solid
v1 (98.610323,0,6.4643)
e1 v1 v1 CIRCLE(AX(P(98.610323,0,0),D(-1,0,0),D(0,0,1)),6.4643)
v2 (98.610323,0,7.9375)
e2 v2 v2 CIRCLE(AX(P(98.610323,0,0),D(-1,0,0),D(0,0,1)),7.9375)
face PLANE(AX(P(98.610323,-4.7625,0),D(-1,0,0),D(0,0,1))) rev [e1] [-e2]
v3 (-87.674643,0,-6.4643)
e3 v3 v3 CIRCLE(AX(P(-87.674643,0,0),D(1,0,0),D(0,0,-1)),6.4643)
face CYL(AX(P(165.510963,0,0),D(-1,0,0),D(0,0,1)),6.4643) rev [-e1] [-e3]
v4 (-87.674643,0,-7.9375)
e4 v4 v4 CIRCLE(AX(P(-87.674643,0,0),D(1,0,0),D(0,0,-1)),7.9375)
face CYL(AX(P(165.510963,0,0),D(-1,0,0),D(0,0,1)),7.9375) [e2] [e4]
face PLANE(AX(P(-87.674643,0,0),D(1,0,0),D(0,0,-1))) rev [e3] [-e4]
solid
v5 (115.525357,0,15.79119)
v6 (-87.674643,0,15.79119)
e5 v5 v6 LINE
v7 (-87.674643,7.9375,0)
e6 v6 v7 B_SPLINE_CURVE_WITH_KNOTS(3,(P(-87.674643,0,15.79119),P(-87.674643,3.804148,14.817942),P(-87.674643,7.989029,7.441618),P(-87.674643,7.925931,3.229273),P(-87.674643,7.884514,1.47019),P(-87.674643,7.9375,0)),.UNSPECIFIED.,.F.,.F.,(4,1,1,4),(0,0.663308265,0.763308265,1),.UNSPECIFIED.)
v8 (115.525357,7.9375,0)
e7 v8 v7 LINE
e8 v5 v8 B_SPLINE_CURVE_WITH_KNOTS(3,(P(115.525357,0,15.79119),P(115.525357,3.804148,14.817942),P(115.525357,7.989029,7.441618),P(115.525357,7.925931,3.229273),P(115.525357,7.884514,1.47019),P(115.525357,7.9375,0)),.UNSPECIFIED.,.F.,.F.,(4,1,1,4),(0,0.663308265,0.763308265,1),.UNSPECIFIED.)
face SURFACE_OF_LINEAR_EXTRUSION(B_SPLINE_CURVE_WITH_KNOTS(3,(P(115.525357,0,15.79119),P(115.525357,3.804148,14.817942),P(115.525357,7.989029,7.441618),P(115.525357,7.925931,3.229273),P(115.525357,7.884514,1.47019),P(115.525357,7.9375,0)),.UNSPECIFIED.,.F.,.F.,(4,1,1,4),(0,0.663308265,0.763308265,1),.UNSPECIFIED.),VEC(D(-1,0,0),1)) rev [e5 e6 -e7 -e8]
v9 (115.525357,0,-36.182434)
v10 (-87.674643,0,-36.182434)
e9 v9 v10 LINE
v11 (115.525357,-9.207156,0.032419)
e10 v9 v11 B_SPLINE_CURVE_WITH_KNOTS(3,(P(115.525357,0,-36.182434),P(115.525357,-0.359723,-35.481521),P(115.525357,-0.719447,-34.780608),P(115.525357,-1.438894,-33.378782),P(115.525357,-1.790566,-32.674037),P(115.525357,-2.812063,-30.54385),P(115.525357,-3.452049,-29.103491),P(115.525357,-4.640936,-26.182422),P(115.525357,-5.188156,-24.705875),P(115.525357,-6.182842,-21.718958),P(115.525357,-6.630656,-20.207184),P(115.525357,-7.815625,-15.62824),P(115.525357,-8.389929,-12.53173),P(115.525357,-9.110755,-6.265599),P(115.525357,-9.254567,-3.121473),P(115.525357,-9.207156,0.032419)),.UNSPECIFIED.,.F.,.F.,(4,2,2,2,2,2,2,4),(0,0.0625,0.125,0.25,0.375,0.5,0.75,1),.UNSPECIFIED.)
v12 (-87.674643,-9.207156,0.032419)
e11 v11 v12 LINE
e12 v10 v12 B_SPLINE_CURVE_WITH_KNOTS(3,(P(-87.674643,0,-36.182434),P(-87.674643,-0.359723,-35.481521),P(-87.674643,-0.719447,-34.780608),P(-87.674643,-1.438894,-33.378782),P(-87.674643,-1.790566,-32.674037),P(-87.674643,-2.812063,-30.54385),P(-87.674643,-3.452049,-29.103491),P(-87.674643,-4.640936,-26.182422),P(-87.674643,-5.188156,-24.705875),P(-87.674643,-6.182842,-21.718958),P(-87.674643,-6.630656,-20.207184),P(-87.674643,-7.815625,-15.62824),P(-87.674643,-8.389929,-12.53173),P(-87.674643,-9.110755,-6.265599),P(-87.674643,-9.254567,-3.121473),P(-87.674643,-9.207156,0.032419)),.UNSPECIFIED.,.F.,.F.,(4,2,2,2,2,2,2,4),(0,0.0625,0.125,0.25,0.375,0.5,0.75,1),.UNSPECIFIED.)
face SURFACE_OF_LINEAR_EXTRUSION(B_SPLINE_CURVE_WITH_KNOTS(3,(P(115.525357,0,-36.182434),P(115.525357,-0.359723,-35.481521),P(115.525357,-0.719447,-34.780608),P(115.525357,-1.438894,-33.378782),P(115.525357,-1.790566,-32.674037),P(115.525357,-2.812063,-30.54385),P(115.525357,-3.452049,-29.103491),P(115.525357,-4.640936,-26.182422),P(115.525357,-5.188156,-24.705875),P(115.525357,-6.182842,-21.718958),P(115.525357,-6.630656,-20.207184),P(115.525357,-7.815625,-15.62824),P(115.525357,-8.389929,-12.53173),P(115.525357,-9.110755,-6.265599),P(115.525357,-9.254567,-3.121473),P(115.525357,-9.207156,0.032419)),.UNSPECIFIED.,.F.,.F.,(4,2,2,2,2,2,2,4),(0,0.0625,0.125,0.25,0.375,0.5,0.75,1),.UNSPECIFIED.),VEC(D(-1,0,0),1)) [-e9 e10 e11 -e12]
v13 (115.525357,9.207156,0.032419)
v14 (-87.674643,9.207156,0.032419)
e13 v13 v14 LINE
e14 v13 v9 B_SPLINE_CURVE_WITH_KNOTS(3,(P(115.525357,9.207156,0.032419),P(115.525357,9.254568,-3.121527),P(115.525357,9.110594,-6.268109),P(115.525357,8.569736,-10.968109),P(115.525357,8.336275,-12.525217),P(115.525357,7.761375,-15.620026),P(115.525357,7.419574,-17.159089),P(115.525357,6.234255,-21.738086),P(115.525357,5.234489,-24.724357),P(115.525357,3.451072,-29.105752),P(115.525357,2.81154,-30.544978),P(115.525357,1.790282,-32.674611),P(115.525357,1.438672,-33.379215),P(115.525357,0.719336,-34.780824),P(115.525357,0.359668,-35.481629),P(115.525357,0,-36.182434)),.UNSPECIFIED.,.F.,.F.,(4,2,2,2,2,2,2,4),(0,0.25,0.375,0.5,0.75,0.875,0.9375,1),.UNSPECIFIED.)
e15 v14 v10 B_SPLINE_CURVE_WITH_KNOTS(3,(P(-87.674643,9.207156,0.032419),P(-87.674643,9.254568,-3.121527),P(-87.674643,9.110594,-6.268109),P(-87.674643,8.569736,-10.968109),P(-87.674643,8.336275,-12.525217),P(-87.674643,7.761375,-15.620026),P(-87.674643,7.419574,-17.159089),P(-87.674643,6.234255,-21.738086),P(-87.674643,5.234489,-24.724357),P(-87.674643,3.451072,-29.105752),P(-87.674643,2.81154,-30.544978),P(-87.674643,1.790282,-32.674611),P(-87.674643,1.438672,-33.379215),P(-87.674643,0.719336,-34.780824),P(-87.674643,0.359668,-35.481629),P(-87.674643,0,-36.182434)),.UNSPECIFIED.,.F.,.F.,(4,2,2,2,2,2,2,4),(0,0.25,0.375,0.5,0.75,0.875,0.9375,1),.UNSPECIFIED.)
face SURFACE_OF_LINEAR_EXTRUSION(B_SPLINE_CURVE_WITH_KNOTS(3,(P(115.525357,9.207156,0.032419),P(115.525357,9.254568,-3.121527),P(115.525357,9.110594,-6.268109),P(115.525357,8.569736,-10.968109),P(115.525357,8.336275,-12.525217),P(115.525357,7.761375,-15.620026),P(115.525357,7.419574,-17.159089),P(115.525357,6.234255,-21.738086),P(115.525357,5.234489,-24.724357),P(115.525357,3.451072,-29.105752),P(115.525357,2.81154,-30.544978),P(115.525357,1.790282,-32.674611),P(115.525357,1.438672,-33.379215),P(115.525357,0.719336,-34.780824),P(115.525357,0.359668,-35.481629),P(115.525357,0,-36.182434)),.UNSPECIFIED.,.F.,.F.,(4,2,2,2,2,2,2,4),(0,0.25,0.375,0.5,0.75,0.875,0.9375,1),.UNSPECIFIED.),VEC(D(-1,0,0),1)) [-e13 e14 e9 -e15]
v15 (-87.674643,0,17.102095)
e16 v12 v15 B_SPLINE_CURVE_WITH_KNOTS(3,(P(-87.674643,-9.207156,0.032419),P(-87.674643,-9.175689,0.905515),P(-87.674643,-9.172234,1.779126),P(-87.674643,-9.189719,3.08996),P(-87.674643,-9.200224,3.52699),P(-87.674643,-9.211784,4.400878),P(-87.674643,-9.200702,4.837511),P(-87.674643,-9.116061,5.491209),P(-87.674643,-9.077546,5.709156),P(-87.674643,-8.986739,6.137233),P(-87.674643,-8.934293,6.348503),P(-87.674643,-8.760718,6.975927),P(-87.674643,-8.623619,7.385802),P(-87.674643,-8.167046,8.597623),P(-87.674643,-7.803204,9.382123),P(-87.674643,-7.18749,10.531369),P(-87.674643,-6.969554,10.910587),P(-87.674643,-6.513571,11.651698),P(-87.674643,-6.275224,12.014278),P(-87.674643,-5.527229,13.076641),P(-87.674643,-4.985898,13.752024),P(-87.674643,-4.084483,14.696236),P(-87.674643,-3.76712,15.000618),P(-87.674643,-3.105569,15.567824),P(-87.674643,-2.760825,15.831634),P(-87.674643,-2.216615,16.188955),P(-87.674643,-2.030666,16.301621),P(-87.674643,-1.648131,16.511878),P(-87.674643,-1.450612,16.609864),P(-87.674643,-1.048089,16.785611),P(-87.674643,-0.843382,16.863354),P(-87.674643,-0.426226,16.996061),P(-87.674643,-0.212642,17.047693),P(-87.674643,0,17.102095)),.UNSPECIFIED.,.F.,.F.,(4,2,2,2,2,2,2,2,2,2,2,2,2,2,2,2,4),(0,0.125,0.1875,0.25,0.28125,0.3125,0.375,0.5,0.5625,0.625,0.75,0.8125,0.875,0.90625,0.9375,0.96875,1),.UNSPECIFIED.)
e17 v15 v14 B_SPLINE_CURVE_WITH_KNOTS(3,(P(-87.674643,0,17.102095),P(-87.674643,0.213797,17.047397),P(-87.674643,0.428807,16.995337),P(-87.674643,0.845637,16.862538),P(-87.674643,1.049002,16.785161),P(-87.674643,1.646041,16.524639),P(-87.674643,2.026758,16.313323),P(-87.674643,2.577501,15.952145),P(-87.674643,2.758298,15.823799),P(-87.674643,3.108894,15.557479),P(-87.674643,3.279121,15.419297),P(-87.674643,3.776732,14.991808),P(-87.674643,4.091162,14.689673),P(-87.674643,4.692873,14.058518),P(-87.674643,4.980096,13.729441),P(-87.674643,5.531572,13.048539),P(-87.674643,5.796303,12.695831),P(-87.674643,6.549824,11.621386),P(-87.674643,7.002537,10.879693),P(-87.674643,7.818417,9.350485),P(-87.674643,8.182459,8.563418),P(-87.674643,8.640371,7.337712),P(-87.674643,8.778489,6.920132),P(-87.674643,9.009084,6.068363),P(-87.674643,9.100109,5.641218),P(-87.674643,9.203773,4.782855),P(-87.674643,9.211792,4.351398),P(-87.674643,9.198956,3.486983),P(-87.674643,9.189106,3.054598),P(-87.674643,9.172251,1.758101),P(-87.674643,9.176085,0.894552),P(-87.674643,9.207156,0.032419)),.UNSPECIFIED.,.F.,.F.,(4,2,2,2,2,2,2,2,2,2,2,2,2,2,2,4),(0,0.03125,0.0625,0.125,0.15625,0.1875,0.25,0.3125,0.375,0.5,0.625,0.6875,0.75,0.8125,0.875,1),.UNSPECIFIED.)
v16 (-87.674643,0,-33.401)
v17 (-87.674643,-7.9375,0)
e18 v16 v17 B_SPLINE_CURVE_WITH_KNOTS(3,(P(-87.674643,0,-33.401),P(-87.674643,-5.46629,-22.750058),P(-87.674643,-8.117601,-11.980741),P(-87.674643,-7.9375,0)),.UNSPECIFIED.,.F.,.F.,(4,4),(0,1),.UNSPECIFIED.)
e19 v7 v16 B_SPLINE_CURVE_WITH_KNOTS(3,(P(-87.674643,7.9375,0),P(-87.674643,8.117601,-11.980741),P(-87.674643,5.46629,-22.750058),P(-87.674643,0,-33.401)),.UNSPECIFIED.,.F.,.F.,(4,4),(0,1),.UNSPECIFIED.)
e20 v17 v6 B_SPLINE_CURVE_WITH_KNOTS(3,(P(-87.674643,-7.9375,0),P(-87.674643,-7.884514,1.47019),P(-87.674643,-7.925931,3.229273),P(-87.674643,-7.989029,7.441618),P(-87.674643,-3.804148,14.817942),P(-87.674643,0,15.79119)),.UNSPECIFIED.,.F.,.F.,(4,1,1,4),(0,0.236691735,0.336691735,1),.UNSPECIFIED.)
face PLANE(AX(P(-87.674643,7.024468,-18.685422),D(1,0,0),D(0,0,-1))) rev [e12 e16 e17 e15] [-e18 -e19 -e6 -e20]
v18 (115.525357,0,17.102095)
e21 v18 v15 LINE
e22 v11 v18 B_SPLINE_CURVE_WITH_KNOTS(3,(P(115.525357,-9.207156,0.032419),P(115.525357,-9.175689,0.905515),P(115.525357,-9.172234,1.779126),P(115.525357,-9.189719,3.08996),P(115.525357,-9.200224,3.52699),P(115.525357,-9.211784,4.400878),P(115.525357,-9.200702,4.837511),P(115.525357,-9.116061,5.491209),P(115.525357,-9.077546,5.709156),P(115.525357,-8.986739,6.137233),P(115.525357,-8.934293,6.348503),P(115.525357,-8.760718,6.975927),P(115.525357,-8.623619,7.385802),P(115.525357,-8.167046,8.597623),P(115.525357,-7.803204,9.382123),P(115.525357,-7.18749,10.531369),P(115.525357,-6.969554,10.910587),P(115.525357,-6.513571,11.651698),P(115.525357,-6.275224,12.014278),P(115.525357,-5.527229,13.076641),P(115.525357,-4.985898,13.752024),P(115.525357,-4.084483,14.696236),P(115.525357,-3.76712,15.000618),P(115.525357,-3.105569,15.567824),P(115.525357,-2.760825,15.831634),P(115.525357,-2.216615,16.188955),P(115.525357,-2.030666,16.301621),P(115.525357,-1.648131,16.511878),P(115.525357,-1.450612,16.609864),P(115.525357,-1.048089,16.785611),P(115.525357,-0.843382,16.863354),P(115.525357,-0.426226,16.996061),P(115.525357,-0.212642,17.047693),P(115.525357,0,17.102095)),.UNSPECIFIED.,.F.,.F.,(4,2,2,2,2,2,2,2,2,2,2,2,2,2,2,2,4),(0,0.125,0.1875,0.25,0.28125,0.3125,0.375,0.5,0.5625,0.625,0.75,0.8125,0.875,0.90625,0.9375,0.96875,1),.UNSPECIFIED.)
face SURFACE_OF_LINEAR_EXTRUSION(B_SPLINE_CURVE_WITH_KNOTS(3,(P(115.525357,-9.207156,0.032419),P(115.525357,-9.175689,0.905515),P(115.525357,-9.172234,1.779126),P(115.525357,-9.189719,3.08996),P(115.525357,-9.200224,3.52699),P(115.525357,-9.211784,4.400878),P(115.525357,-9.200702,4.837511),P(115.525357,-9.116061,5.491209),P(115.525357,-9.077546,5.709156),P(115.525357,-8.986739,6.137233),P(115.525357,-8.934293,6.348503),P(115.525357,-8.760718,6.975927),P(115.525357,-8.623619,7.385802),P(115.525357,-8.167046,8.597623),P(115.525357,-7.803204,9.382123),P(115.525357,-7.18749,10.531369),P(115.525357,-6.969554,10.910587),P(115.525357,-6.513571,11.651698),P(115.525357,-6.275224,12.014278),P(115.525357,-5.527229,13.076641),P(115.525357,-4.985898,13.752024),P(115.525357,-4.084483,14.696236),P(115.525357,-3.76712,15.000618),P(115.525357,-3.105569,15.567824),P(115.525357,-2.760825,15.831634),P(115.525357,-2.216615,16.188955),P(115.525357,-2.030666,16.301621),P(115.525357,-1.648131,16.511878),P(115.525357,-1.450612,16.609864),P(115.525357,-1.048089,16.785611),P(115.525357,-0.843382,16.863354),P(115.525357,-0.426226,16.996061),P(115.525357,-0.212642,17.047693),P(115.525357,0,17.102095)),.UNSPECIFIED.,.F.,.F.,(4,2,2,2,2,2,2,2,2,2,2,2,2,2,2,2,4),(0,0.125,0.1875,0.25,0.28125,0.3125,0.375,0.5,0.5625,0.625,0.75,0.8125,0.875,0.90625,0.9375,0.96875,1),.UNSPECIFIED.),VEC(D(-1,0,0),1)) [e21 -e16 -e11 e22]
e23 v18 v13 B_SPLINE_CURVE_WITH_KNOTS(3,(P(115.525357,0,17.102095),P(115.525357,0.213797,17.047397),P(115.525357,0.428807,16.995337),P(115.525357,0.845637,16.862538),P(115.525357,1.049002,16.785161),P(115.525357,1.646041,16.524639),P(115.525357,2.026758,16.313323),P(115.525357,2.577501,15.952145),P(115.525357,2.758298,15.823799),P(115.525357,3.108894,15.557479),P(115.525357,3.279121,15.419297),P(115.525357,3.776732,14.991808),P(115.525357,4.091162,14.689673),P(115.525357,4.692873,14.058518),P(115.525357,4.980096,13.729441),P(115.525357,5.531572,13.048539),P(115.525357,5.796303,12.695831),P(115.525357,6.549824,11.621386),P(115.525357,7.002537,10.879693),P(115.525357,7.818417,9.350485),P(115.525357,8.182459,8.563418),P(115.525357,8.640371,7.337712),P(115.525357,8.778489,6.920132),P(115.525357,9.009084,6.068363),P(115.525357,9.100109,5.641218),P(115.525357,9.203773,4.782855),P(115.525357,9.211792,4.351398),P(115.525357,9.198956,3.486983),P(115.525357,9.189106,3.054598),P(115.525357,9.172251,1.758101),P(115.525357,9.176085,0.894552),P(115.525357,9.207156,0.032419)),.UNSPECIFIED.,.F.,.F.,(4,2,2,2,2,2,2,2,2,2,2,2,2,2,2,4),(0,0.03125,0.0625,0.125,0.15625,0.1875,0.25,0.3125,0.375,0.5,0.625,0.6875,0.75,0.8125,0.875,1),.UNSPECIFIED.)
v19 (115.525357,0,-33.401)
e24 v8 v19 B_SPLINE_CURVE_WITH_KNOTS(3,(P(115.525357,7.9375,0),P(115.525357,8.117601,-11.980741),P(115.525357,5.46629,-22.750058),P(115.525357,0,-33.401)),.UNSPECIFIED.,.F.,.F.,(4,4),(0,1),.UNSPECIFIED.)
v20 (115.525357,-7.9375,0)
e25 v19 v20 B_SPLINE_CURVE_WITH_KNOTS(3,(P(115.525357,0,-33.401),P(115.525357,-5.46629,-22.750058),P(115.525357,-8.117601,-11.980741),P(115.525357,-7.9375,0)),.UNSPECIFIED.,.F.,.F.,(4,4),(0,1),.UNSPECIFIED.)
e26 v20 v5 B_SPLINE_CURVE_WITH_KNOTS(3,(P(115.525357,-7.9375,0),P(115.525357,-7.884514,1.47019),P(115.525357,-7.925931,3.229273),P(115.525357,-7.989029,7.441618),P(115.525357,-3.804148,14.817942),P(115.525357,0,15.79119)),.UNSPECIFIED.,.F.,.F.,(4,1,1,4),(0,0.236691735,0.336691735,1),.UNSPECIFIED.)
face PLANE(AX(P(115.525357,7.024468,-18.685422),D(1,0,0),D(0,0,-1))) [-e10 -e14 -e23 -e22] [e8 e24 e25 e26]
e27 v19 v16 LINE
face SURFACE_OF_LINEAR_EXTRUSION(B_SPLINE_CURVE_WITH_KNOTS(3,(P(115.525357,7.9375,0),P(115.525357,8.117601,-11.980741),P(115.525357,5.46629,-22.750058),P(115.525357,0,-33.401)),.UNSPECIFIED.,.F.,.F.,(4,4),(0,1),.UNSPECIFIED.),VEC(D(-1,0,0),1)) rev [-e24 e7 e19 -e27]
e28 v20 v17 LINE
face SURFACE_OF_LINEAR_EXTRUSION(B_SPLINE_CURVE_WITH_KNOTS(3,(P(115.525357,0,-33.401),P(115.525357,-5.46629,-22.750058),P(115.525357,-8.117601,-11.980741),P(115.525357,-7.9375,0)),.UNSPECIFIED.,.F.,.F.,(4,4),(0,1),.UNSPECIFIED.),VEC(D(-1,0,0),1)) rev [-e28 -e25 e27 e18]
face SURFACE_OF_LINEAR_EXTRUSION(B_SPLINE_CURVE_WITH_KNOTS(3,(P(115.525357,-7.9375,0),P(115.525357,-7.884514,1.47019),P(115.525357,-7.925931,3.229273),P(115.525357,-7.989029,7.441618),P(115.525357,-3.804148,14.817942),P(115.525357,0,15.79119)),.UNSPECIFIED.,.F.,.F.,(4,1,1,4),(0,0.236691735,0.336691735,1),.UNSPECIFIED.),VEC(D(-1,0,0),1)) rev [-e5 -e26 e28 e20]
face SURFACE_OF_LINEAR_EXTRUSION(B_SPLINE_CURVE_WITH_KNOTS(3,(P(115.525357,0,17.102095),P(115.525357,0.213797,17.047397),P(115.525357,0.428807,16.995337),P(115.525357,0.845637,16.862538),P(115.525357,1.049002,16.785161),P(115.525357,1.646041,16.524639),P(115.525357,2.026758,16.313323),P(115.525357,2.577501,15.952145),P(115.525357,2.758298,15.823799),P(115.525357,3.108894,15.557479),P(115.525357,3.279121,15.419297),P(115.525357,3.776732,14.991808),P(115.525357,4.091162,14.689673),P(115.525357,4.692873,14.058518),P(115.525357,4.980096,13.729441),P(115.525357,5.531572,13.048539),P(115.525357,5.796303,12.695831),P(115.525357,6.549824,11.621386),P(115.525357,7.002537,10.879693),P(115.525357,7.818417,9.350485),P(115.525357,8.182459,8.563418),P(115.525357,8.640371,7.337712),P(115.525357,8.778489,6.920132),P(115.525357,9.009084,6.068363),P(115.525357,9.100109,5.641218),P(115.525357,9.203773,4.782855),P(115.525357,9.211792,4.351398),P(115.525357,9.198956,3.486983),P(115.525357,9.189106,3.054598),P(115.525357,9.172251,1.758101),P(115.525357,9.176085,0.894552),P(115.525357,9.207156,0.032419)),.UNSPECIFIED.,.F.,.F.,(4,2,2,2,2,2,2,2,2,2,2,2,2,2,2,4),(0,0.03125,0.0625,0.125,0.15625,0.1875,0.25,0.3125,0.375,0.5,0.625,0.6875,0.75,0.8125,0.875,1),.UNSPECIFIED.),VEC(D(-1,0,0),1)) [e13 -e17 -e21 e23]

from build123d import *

# Parameters (mm, degrees)
BOSS_EXTRUDE1_DEPTH      = 98.610323
BOSS_EXTRUDE1_DEPTH_BACK = 87.674643
SKETCH1_R                = 7.9375
SKETCH1_R_2              = 6.4643
EXTRUDE_THIN1_START      = -203.2
EXTRUDE_THIN1_DEPTH      = 203.2


# Read off the part's stored shape, not the designer's step: Extrude-Thin1
with BuildPart() as part:
    # Sketch1 → Boss-Extrude1 (new, two sides: drawn at the far end of the back side and taken through both)
    with BuildSketch(Plane(origin=(0, 0, 0), x_dir=(0, 0, -1), z_dir=(1, 0, 0)).offset(-BOSS_EXTRUDE1_DEPTH_BACK)):
        with Locations(Location((0, 0, 0), (0, 0, 180))):
            Circle(SKETCH1_R)
        with Locations(Location((0, 0, 0), (0, 0, 180))):
            Circle(SKETCH1_R_2, mode=Mode.SUBTRACT)
    extrude(amount=BOSS_EXTRUDE1_DEPTH + BOSS_EXTRUDE1_DEPTH_BACK)


with BuildPart() as body_2:
    # Extrude-Thin1 outline → Extrude-Thin1 (new body)
    with BuildSketch(Plane.ZY.offset(87.674642954).offset(EXTRUDE_THIN1_START)):
        with BuildLine():
            add(Edge.make_bspline(
                [(17.102094562, 0), (17.04739702, 0.213797016), (16.995336819, 0.42880706), (16.862538118, 0.845636753), (16.785160791, 1.049002351), (16.524638716, 1.646041309), (16.313322861, 2.026757553), (15.952145288, 2.577500677), (15.823799266, 2.758298236), (15.55747882, 3.108894312), (15.419296606, 3.279121061), (14.991807723, 3.776732023), (14.689672994, 4.091162254), (14.058517718, 4.692872976), (13.729440661, 4.980096404), (13.048538768, 5.531572182), (12.695830839, 5.79630298), (11.621386484, 6.549823619), (10.879692917, 7.002537116), (9.350485078, 7.81841744), (8.563418356, 8.182458905), (7.337712392, 8.640371405), (6.920131838, 8.778488758), (6.068362945, 9.009083778), (5.641217648, 9.100109427), (4.782855054, 9.20377314), (4.351397815, 9.211792234), (3.486983413, 9.198956322), (3.054597909, 9.189105956), (1.758100925, 9.172251023), (0.894552451, 9.176084553), (0.032418914, 9.207156149)],
                knots=[0, 0, 0, 0, 0.03125, 0.03125, 0.0625, 0.0625, 0.125, 0.125, 0.15625, 0.15625, 0.1875, 0.1875, 0.25, 0.25, 0.3125, 0.3125, 0.375, 0.375, 0.5, 0.5, 0.625, 0.625, 0.6875, 0.6875, 0.75, 0.75, 0.8125, 0.8125, 0.875, 0.875, 1, 1, 1, 1], degree=3))
            add(Edge.make_bspline(
                [(0.032418914, 9.207156149), (-3.121526951, 9.254567879), (-6.268108602, 9.110594057), (-10.968108502, 8.569736414), (-12.52521706, 8.336275013), (-15.620025789, 7.761375356), (-17.159089419, 7.419573925), (-21.738086481, 6.234254823), (-24.724357097, 5.234488958), (-29.105751606, 3.451071682), (-30.544977721, 2.811540258), (-32.674611159, 1.79028171), (-33.379214501, 1.438672145), (-34.780824408, 0.719336072), (-35.481629362, 0.359668036), (-36.182434315, 0)],
                knots=[0, 0, 0, 0, 0.25, 0.25, 0.375, 0.375, 0.5, 0.5, 0.75, 0.75, 0.875, 0.875, 0.9375, 0.9375, 1, 1, 1, 1], degree=3))
            add(Edge.make_bspline(
                [(-36.182434315, 0), (-35.481521346, -0.359723472), (-34.780608377, -0.719446944), (-33.378782439, -1.438893888), (-32.674037428, -1.790565857), (-30.54384954, -2.812063227), (-29.103490823, -3.452048995), (-26.182421908, -4.640936279), (-24.705875102, -5.18815569), (-21.718958236, -6.182841679), (-20.207183631, -6.630656344), (-15.628240433, -7.815624895), (-12.531730425, -8.389928975), (-6.265599348, -9.11075463), (-3.121472775, -9.254567065), (0.032418914, -9.207156149)],
                knots=[0, 0, 0, 0, 0.0625, 0.0625, 0.125, 0.125, 0.25, 0.25, 0.375, 0.375, 0.5, 0.5, 0.75, 0.75, 1, 1, 1, 1], degree=3))
            add(Edge.make_bspline(
                [(0.032418914, -9.207156149), (0.905514517, -9.175689476), (1.779125635, -9.172233827), (3.089959502, -9.189718729), (3.526990194, -9.200223759), (4.400877656, -9.211783508), (4.837511077, -9.200702397), (5.491209368, -9.116060671), (5.709156111, -9.077545633), (6.137233482, -8.98673913), (6.348502946, -8.934293247), (6.975926684, -8.760718275), (7.385801524, -8.623619453), (8.597622689, -8.167045839), (9.38212336, -7.803203601), (10.531369419, -7.187490205), (10.910587265, -6.969553739), (11.651698354, -6.513571235), (12.014278322, -6.275223658), (13.076641296, -5.527228859), (13.752024112, -4.98589787), (14.696235941, -4.084483233), (15.000618027, -3.767120438), (15.567824422, -3.105568901), (15.83163431, -2.760825125), (16.188955162, -2.216615083), (16.301620626, -2.030666021), (16.511878279, -1.648130786), (16.609863922, -1.450611941), (16.785610923, -1.048088593), (16.863353526, -0.843382437), (16.996060883, -0.426225712), (17.047692544, -0.212641899), (17.102094562, 0)],
                knots=[0, 0, 0, 0, 0.125, 0.125, 0.1875, 0.1875, 0.25, 0.25, 0.28125, 0.28125, 0.3125, 0.3125, 0.375, 0.375, 0.5, 0.5, 0.5625, 0.5625, 0.625, 0.625, 0.75, 0.75, 0.8125, 0.8125, 0.875, 0.875, 0.90625, 0.90625, 0.9375, 0.9375, 0.96875, 0.96875, 1, 1, 1, 1], degree=3))
        make_face()
        with BuildLine():
            add(Edge.make_bspline(
                [(0, 7.9375), (-11.980740822, 8.117600633), (-22.750058366, 5.466290217), (-33.401, 0)],
                knots=[0, 0, 0, 0, 1, 1, 1, 1], degree=3))
            add(Edge.make_bspline(
                [(15.791190362, 0), (14.817942328, 3.804147623), (7.441618018, 7.989029069), (3.229273207, 7.925930538), (1.470189631, 7.884513847), (0, 7.9375)],
                knots=[0, 0, 0, 0, 0.663308265, 0.763308265, 1, 1, 1, 1], degree=3))
            add(Edge.make_bspline(
                [(0, -7.9375), (1.470189631, -7.884513847), (3.229273207, -7.925930538), (7.441618018, -7.989029069), (14.817942328, -3.804147623), (15.791190362, 0)],
                knots=[0, 0, 0, 0, 0.236691735, 0.336691735, 1, 1, 1, 1], degree=3))
            add(Edge.make_bspline(
                [(-33.401, 0), (-22.750058366, -5.466290217), (-11.980740822, -8.117600633), (0, -7.9375)],
                knots=[0, 0, 0, 0, 1, 1, 1, 1], degree=3))
        make_face(mode=Mode.SUBTRACT)
    extrude(amount=EXTRUDE_THIN1_DEPTH)


solid = Compound([part.part, body_2.part])
